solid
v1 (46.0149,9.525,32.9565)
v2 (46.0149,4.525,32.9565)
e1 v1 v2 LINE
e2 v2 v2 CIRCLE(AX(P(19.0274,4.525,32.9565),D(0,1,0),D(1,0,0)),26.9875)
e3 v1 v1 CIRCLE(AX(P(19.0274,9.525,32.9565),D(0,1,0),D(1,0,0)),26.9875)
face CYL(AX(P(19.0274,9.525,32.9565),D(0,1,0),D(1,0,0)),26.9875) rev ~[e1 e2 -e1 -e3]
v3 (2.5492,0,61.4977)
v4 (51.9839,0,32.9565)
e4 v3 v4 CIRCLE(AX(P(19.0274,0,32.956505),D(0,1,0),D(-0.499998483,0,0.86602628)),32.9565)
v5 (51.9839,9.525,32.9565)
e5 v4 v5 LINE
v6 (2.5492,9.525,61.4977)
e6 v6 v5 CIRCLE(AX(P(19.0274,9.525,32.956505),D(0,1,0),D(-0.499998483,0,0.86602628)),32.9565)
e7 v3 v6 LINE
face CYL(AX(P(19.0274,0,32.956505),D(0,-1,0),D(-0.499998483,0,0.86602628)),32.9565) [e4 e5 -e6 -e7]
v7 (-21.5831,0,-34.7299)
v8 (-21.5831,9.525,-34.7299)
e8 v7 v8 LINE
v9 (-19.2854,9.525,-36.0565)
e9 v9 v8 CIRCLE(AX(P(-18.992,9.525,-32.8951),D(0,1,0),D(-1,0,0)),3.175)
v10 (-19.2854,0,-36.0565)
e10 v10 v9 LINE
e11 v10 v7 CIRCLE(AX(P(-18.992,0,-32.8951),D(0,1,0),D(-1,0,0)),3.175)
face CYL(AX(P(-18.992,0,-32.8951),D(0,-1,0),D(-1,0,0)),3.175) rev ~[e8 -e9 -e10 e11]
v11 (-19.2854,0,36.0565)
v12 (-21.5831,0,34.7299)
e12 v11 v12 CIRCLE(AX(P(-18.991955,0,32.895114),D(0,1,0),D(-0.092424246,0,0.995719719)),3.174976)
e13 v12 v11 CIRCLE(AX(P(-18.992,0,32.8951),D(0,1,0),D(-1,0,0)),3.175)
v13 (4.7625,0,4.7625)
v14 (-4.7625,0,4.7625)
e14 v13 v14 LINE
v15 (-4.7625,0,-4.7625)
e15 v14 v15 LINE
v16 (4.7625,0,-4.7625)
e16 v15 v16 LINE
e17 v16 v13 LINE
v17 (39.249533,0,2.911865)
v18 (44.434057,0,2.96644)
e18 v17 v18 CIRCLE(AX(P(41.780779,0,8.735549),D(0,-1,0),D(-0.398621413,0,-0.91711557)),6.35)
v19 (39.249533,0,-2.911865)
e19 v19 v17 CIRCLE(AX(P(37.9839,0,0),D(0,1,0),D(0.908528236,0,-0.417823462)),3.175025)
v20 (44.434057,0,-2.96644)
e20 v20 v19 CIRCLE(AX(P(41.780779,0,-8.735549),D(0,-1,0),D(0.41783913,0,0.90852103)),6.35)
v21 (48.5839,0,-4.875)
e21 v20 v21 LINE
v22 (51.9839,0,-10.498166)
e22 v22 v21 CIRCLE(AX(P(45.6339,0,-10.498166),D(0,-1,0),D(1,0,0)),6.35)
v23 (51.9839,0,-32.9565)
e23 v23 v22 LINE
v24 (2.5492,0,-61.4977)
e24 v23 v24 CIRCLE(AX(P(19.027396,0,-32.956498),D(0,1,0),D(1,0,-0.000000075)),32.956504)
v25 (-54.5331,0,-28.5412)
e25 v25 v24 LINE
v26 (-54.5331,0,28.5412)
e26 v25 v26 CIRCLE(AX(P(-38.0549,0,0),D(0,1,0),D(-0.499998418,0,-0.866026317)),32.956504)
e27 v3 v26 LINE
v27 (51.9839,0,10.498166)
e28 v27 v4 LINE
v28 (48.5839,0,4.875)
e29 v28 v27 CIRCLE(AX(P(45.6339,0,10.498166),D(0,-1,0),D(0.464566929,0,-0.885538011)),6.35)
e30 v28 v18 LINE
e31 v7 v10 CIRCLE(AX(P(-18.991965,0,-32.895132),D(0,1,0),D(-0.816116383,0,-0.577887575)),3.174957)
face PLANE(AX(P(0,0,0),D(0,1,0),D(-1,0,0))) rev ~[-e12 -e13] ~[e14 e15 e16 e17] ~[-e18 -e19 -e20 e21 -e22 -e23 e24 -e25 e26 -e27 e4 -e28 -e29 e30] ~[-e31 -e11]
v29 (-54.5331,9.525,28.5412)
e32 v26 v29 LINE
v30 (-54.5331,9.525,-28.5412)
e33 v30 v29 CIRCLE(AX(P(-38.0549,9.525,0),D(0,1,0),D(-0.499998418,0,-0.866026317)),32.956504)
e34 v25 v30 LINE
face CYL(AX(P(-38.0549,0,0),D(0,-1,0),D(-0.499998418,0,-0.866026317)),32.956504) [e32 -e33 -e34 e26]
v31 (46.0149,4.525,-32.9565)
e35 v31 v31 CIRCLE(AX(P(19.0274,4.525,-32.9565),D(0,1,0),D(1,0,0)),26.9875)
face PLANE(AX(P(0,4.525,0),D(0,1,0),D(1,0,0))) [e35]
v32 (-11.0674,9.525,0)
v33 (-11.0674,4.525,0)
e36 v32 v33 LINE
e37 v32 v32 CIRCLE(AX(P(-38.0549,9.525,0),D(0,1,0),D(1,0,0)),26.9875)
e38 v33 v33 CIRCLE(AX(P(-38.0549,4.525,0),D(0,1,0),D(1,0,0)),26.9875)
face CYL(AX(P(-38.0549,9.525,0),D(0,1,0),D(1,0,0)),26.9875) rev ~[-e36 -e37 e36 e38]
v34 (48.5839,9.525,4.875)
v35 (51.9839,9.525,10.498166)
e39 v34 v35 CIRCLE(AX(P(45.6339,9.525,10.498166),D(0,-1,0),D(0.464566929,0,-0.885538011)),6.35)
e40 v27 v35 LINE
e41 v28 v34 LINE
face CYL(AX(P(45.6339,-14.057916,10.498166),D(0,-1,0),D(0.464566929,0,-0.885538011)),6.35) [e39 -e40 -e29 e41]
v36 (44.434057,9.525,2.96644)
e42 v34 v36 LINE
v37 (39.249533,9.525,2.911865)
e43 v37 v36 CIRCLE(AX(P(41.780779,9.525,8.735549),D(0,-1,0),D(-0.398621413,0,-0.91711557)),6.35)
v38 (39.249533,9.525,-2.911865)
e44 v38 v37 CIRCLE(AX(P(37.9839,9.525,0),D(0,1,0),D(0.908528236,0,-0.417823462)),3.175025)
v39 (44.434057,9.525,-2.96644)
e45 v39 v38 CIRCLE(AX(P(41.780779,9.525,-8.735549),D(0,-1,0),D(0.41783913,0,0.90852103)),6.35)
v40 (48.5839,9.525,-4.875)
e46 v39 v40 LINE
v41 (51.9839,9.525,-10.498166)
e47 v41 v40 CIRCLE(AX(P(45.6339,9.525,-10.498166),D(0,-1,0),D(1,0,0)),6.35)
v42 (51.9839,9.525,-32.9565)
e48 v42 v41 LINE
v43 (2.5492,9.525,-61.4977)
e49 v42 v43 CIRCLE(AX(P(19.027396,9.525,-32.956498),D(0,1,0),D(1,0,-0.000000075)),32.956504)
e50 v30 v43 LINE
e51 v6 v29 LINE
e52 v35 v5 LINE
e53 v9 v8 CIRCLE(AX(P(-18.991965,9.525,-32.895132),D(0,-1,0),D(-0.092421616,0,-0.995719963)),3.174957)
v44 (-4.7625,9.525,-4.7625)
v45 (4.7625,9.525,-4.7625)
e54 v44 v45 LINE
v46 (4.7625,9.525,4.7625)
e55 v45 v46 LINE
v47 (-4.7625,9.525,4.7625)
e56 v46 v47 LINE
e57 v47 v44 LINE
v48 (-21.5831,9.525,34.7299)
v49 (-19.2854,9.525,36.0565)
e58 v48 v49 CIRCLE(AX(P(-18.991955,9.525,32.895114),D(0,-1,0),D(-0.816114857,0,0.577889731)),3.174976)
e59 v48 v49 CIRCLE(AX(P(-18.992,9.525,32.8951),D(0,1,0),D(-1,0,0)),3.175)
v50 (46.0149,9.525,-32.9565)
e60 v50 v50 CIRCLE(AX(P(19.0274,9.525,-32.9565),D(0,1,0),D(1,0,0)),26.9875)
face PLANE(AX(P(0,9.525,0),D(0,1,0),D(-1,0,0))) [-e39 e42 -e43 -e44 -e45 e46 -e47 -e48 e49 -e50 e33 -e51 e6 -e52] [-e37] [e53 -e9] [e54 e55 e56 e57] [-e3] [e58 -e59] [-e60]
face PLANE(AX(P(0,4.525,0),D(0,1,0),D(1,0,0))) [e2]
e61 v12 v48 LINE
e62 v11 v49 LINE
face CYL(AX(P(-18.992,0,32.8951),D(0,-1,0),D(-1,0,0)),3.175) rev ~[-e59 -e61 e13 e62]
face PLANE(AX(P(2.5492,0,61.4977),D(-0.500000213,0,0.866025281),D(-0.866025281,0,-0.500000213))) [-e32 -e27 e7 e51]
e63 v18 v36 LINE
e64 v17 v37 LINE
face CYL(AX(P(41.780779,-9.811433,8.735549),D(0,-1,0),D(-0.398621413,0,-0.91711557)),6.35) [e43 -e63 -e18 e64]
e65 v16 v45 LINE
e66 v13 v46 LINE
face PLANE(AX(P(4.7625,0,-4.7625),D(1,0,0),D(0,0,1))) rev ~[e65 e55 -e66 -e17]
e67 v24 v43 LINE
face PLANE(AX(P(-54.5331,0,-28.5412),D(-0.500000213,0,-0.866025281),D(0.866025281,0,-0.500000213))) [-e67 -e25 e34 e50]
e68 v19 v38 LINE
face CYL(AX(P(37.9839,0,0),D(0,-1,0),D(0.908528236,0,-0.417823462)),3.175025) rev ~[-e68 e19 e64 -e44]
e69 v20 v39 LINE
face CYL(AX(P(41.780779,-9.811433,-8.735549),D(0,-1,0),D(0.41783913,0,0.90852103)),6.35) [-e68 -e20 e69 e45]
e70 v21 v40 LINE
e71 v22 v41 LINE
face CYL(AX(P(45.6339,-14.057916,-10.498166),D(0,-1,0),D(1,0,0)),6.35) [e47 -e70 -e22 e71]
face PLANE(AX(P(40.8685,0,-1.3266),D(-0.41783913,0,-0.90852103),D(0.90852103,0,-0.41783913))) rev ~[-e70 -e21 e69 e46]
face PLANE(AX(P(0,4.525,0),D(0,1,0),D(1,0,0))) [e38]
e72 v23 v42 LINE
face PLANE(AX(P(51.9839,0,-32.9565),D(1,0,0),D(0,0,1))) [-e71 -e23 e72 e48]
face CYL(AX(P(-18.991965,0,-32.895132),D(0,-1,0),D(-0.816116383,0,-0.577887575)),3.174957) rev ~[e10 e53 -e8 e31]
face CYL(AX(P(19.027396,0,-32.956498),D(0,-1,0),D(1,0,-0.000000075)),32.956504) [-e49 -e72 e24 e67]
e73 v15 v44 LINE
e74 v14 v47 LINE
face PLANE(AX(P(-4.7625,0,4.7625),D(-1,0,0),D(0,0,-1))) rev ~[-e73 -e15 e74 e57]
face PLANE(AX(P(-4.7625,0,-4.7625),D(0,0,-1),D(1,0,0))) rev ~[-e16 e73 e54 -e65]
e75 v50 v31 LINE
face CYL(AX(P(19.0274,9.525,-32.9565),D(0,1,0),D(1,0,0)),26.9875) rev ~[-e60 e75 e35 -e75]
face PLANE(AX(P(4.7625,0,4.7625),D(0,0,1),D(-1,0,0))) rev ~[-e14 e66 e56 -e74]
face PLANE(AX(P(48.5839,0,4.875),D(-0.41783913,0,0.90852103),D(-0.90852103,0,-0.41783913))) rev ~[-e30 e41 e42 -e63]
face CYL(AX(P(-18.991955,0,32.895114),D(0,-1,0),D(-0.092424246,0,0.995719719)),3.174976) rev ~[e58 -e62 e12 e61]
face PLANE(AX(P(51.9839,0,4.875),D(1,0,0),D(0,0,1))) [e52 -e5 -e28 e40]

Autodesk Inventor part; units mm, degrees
ref_plane "YZ Plane" through (0, 0, 0) normal (1, 0, 0) x (0, 1, 0)
ref_plane "XZ Plane" through (0, 0, 0) normal (0, 1, 0) x (-1, 0, 0)
ref_plane "XY Plane" through (0, 0, 0) normal (0, 0, 1) x (1, 0, 0)
sketch "Sketch1" plane through (0, 0, 0) normal (0, 1, 0) x (-1, 0, 0)
  line L0 (54.5331, -28.5412) -> (-2.5492, -61.4977)
  line L1 (-51.9839, -32.9565) -> (-51.9839, 32.9565)
  line L2 (-2.5492, 61.4977) -> (54.5331, 28.5412)
  circle A0 centre (38.0549, 0) radius 32.9565 construction
  circle A1 centre (-19.0274, 32.9565) radius 32.9565 construction
  circle A2 centre (-19.0274, -32.9565) radius 32.9565 construction
  line L3 (4.7625, -4.7625) -> (-4.7625, -4.7625)
  line L4 (-4.7625, -4.7625) -> (-4.7625, 4.7625)
  line L5 (-4.7625, 4.7625) -> (4.7625, 4.7625)
  line L6 (4.7625, 4.7625) -> (4.7625, -4.7625)
  line L7 (4.7625, -4.7625) -> (-4.7625, 4.7625) construction
  line L8 (-4.7625, -4.7625) -> (4.7625, 4.7625) construction
  line L9 (-51.9839, 4.875) -> (-48.5839, 4.875)
  line L10 (-48.5839, 4.875) -> (-40.8685, 1.3266)
  line L11 (-40.8685, -1.3266) -> (-48.5839, -4.875)
  line L12 (-48.5839, -4.875) -> (-51.9839, -4.875)
  arc A3 (54.5331, -28.5412) -> (54.5331, 28.5412) centre (38.0549, 0) ccw
  arc A4 (-2.5492, 61.4977) -> (-51.9839, 32.9565) centre (-19.0274, 32.9565) ccw
  arc A5 (-51.9839, -32.9565) -> (-2.5492, -61.4977) centre (-19.0274, -32.9565) ccw
  arc A6 (-40.8685, -1.3266) -> (-40.8685, 1.3266) centre (-37.9839, 0) ccw
  line L13 (-37.9839, 0) -> (-40.8685, -1.3266) construction
  line L14 (-37.9839, 0) -> (-40.8685, 1.3266) construction
  arc A7 (21.5831, -34.7299) -> (19.2854, -36.0565) centre (18.992, -32.8951) ccw
  arc A8 (19.2854, 36.0565) -> (21.5831, 34.7299) centre (18.992, 32.8951) ccw
  circle A9 centre (18.992, 32.8951) radius 3.175
  circle A10 centre (18.992, -32.8951) radius 3.175
  point P0 (0, 0)
  point P1 (0, 0)
  point P2 (-51.9839, 0)
  point P3 (21.5831, 34.7299)
  point P4 (21.5831, -34.7299)
  dimension "d0" = 9.525
  dimension "d1" = 9.525
  dimension "d2" = 65.913
  dimension "d5" = 14
  dimension "d6" = 3.4
  dimension "d7" = 9.75
  dimension "d12" = 6.35
  dimension "d15" = 360
extrude "Extrusion1" add sketch "Sketch1" along normal blind 9.525 contours L0 A5 L1 L12 L11 A6 L10 L9 A4 L2 A3
fillet "Fillet1" radius 6.35 7 edges at (51.9839, 4.7625, 4.875) (51.9839, 4.7625, -4.875) (51.9839, 4.7625, 32.9565) (-54.5331, 4.7625, -28.5412) (51.9839, 4.7625, -32.9565) (40.8685, 4.7625, 1.3266) (40.8685, 4.7625, -1.3266)
sketch "Sketch2" plane through (0, 9.525, 0) normal (0, 1, 0) x (1, 0, 0)
  circle A0 centre (19.0274, -32.9565) radius 32.9565
  circle A1 centre (19.0274, -32.9565) radius 26.9875
  circle A2 centre (19.0274, 32.9565) radius 32.9565
  circle A3 centre (19.0274, 32.9565) radius 26.9875
  circle A4 centre (-38.0549, 0) radius 32.9565
  circle A5 centre (-38.0549, 0) radius 26.9875
  line L0 (-54.5331, -28.5412) -> (2.5492, -61.4977) projected
  line L1 (2.5492, 61.4977) -> (-54.5331, 28.5412) projected
  line L2 (51.9839, -32.9565) -> (51.9839, 32.9565) projected
  line L3 (51.9839, -32.9565) -> (51.9839, 32.9565) projected
  point P0 (0, 0)
  point P1 (-94.4429, -5.4993)
  point P2 (42.4589, -84.5396)
  point P3 (42.4589, 84.5396)
  point P4 (-94.4429, 5.4993)
  point P5 (51.9839, 10.4982)
  point P6 (51.9839, 79.0403)
  point P7 (51.9839, -79.0403)
  point P8 (51.9839, -10.4982)
  point P9 (2.5492, 61.4977)
  point P10 (-54.5331, 28.5412)
  point P11 (-9.5137, 16.4782)
  point P12 (-54.5331, -28.5412)
  point P13 (2.5492, -61.4977)
  point P14 (-9.5137, -16.4783)
  point P15 (19.0274, 0)
  dimension "d9" = 53.975
extrude "Extrusion2" cut sketch "Sketch2" against normal blind 5 contours A1 | A3 | A5
properties part number "TOP_PLATE_WEIGHTS_TREBUCHET" material "Wood (Birch)"
